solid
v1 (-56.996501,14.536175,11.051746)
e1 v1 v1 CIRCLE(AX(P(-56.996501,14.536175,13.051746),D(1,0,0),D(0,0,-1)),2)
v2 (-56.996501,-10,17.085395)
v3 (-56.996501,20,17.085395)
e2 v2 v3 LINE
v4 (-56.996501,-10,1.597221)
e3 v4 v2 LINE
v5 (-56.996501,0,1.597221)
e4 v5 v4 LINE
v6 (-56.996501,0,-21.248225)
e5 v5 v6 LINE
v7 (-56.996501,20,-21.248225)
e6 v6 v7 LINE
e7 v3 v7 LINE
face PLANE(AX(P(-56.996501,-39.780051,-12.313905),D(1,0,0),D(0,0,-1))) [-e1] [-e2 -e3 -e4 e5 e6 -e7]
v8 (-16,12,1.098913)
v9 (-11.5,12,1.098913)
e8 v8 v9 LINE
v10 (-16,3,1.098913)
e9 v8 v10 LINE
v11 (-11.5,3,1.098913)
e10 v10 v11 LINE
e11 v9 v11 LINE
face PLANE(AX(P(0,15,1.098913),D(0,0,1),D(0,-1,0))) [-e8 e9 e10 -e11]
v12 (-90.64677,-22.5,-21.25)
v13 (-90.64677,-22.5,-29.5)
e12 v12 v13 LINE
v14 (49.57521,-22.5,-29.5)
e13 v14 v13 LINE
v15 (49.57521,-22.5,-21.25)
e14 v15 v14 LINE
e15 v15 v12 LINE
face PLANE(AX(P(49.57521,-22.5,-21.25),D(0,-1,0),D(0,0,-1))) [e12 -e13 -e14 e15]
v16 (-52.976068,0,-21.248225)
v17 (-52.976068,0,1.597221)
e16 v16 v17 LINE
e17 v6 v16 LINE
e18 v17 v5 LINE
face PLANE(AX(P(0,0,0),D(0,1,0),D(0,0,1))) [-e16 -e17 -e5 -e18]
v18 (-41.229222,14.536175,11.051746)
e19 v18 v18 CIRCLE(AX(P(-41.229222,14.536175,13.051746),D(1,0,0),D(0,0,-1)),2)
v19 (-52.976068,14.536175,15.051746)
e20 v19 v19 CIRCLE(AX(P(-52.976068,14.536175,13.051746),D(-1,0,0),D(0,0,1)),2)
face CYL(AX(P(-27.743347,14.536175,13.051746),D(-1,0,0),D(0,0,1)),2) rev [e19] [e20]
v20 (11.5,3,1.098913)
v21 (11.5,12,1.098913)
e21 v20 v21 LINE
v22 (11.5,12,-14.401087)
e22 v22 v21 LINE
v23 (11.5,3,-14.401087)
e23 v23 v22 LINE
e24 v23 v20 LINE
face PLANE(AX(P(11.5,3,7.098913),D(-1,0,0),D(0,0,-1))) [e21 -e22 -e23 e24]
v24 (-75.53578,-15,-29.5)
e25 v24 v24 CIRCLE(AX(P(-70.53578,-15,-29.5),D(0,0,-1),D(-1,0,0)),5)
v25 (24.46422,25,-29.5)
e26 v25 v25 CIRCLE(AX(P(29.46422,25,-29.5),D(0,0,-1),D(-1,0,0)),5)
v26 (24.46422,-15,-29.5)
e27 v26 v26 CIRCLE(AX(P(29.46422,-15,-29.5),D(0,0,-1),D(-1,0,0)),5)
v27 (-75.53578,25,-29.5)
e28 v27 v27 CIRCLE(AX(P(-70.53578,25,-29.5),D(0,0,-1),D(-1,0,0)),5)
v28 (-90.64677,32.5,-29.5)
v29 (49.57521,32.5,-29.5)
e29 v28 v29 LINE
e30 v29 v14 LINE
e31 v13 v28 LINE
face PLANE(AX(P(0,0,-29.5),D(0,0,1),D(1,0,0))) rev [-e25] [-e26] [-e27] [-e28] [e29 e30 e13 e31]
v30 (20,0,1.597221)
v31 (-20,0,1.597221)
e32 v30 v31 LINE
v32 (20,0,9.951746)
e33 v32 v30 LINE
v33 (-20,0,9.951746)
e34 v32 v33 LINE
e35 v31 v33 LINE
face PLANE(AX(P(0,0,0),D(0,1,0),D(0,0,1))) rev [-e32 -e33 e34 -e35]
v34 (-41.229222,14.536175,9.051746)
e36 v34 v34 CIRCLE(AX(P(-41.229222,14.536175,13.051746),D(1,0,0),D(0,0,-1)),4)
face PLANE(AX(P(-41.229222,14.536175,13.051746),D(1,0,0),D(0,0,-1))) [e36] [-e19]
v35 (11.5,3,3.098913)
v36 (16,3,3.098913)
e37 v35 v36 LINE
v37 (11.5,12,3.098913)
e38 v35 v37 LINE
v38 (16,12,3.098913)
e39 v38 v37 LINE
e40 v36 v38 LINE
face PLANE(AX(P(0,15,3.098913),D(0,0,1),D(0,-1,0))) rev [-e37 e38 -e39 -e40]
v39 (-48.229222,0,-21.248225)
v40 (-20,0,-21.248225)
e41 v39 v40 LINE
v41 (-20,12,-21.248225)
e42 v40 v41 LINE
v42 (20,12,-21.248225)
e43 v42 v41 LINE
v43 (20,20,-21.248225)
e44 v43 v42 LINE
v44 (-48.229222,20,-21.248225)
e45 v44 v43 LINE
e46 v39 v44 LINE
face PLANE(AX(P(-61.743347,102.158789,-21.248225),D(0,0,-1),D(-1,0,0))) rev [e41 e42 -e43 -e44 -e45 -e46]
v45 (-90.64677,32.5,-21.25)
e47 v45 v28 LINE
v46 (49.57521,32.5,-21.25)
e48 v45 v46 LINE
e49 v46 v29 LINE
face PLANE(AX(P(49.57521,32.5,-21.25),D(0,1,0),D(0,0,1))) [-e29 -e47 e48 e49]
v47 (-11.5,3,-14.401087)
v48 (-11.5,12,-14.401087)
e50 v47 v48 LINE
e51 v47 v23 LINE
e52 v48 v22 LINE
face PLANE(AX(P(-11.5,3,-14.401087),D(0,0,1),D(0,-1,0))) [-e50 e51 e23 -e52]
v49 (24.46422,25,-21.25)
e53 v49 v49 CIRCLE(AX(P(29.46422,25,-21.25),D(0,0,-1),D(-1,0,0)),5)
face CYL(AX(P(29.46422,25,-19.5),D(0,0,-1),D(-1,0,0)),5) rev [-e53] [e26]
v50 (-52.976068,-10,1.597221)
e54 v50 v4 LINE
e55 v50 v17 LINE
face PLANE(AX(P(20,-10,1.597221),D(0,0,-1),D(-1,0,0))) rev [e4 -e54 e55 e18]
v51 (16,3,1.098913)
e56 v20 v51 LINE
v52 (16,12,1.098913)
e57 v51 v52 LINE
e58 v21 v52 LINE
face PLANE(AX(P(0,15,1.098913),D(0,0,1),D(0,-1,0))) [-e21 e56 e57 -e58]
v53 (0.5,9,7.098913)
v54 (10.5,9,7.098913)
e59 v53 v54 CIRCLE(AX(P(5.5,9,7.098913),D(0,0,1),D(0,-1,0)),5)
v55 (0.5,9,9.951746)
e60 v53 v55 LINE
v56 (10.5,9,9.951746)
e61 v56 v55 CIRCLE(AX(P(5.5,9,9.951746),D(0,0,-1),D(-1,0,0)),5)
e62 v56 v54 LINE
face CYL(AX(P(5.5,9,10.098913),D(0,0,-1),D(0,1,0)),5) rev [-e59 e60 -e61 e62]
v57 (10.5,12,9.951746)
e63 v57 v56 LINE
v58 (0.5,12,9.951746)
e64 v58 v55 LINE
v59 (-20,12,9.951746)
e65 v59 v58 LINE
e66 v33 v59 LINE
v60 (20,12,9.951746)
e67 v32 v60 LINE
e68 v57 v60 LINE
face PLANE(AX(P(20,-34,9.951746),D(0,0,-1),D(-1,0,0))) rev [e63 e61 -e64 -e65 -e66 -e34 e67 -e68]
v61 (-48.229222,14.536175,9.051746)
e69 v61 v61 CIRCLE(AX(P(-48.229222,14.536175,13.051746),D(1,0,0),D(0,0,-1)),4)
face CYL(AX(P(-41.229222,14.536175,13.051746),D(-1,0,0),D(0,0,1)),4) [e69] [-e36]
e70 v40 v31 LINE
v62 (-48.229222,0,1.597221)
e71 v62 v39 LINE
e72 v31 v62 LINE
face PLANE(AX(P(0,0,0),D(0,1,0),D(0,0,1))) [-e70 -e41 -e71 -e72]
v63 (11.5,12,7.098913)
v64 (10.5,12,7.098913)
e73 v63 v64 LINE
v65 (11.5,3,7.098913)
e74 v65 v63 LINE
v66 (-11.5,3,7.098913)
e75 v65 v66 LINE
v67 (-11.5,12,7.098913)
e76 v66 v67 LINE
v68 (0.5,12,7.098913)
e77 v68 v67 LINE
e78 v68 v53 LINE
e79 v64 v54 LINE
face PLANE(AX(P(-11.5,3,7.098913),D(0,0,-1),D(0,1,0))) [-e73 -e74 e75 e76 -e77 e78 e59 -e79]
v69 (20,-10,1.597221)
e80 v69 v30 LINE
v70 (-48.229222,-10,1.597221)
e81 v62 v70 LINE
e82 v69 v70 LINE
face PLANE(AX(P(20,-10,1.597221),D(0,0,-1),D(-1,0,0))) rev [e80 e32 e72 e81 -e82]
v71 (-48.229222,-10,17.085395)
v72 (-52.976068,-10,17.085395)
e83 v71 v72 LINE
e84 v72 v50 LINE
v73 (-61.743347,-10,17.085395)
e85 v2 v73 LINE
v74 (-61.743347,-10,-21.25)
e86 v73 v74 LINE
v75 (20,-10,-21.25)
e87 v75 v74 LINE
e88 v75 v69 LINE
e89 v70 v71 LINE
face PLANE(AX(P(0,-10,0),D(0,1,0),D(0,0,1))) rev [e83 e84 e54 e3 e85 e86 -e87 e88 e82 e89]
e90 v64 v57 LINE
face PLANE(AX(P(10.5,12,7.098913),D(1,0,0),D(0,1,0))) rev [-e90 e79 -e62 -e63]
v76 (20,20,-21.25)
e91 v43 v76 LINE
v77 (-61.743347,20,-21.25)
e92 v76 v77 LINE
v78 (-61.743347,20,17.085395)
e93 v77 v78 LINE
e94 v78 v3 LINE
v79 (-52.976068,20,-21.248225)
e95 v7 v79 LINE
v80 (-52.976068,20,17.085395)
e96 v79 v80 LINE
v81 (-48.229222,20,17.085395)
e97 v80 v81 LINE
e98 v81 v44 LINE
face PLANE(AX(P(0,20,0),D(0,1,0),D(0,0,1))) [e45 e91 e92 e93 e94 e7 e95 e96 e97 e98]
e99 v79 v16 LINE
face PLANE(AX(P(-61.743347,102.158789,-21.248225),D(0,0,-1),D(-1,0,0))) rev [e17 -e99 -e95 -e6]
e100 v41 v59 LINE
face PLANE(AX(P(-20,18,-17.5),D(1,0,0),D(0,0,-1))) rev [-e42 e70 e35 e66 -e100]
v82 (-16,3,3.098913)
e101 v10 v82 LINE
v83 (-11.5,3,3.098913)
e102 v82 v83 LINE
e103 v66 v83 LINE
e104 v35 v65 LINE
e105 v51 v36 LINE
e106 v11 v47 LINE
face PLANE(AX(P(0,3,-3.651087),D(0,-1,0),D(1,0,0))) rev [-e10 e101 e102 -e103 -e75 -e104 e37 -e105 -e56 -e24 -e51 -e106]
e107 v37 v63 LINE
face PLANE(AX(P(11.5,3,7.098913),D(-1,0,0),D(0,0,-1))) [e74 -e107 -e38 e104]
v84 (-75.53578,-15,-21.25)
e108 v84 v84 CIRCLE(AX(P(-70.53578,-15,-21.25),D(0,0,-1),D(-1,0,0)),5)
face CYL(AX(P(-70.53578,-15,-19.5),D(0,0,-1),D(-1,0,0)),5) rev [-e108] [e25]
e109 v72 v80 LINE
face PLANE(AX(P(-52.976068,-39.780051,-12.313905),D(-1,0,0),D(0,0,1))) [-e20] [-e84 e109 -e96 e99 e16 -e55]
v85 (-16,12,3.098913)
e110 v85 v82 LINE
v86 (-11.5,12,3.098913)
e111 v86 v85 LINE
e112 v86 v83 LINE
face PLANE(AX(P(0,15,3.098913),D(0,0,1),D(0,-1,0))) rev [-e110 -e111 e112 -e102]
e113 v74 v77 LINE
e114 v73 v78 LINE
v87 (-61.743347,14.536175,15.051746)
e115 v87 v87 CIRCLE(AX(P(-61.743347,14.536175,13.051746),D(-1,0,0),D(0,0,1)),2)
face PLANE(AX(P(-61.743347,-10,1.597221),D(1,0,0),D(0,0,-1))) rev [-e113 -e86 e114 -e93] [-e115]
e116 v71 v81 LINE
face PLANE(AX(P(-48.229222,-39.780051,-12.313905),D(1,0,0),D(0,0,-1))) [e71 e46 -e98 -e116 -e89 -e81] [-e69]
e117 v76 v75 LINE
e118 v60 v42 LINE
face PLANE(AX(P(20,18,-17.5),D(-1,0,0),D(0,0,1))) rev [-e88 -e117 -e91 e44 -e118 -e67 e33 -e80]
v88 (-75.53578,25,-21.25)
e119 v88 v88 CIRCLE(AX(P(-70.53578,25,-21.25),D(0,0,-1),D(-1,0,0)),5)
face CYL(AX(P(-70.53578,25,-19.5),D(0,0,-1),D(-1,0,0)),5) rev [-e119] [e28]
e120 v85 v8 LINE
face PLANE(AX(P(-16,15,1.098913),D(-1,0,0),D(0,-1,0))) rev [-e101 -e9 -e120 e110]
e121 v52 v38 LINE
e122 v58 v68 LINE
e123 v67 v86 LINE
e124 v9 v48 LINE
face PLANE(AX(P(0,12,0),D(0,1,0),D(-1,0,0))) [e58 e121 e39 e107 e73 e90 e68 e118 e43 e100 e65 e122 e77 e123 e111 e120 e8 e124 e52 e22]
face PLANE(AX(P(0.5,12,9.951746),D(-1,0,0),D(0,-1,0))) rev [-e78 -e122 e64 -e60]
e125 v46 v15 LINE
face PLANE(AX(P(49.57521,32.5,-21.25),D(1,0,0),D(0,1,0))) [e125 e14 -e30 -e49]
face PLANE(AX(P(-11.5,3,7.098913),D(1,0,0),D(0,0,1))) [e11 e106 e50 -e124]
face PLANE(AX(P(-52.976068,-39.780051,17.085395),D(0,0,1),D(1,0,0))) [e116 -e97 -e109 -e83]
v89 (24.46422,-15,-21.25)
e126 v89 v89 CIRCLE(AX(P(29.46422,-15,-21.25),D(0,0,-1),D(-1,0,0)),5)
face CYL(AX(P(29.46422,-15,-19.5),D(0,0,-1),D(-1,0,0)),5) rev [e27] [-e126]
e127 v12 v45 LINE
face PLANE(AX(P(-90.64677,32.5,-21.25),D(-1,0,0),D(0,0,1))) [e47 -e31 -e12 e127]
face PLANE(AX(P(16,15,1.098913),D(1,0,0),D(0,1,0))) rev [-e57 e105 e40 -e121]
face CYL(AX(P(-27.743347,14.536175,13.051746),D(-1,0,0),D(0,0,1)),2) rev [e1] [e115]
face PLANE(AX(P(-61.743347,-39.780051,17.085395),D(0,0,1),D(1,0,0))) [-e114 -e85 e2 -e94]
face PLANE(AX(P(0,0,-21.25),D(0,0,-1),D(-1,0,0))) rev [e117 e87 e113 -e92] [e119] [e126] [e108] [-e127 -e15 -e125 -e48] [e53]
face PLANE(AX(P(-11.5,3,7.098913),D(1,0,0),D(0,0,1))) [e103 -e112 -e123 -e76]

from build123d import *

# Parameters (mm, degrees)
SKETCH1_W                       = 40
SKETCH1_H                       = 35
BOSS_EXTRUDE1_DEPTH             = 18
CAVITY1_START                   = -14.401086919
CAVITY1_OUTLINE_W               = 23
CAVITY1_OUTLINE_H               = 12
CAVITY1_DEPTH                   = 21.5
CAVITY1_START_2                 = 7.098913081
CAVITY1_2_OUTLINE_R             = 5
CAVITY1_2_DEPTH                 = 3
CAVITY1_START_3                 = 1.098913081
CAVITY1_3_DEPTH                 = 2
CAVITY1_START_4                 = 10.098913081
CAVITY1_4_OUTLINE_R             = 2.5
CAVITY1_4_DEPTH                 = 4
CUT_EXTRUDE1_DEPTH              = 42.733432002
CUT_EXTRUDE1_DEPTH_BACK         = 42.733432002
SKETCH2_W                       = 52.530025258
SKETCH2_H                       = 12.54309889
CUT_EXTRUDE2_DEPTH              = 43
SKETCH4_W                       = 40
SKETCH4_H                       = 7.548254148
CUT_EXTRUDE3_DEPTH              = 43
BOSS_EXTRUDE2_DEPTH             = 3
SKETCH6_W                       = 81.743347259
SKETCH6_H                       = 13.911125845
BOSS_EXTRUDE3_DEPTH             = 10
SKETCH8_W                       = 4.746846532
SKETCH8_H                       = 29.399300547
BOSS_EXTRUDE4_DEPTH             = 20
BOSS_EXTRUDE4_DIRECTION_2_REACH = 67.288
SKETCH9_R                       = 2
CUT_EXTRUDE4_DEPTH              = 34
SKETCH10_R                      = 4
SKETCH10_R_2                    = 2
BOSS_EXTRUDE5_DEPTH             = 7
BOSS_EXTRUDE6_DEPTH             = 5.186094658
BOSS_EXTRUDE7_DEPTH             = 12
SKETCH14_W                      = 81.743347259
SKETCH14_H                      = 8.25177529
BOSS_EXTRUDE8_DEPTH             = 20
SKETCH16_W                      = 140.221979832
SKETCH16_H                      = 55
BOSS_EXTRUDE9_DEPTH             = 8.25
SKETCH17_R                      = 5
CUT_EXTRUDE5_DEPTH              = 10


# Read off the part's stored shape, not the designer's step: Cavity1
with BuildPart() as part:
    # Sketch1 → Boss-Extrude1 (new body)
    with BuildSketch(Plane(origin=(0, 0, 0), x_dir=(1, 0, 0), z_dir=(0, 1, 0))):
        Rectangle(SKETCH1_W, SKETCH1_H)
    extrude(amount=BOSS_EXTRUDE1_DEPTH)

    # Cavity1 outline → Cavity1 (cut)
    with BuildSketch(Plane.XY.offset(CAVITY1_START)):
        with Locations((0, 9)):
            Rectangle(CAVITY1_OUTLINE_W, CAVITY1_OUTLINE_H)
    extrude(amount=CAVITY1_DEPTH, mode=Mode.SUBTRACT)

    # Cavity1 2 outline → Cavity1 2 (cut)
    with BuildSketch(Plane.XY.offset(CAVITY1_START_2)):
        with Locations((5.5, 9)):
            Circle(CAVITY1_2_OUTLINE_R)
    extrude(amount=CAVITY1_2_DEPTH, mode=Mode.SUBTRACT)

    # Cavity1 3 outline → Cavity1 3 (cut)
    with BuildSketch(Plane.XY.offset(CAVITY1_START_3)):
        with BuildLine():
            Line((-11.5, 15), (-16, 15))
            Line((-16, 15), (-16, 10.821261352))
            Line((-16, 10.821261352), (-14.337589365, 10.821261352))
            ThreePointArc((-14.337589365, 10.821261352), (-12.516328014, 9), (-14.337589365, 7.178738648))
            Line((-14.337589365, 7.178738648), (-16, 7.178738648))
            Line((-16, 7.178738648), (-16, 3))
            Line((-16, 3), (-11.5, 3))
            Line((-11.5, 3), (-11.5, 15))
        make_face()
        with BuildLine():
            Line((16, 15), (11.5, 15))
            Line((11.5, 15), (11.5, 3))
            Line((11.5, 3), (16, 3))
            Line((16, 3), (16, 7.178738648))
            Line((16, 7.178738648), (14.337589365, 7.178738648))
            ThreePointArc((14.337589365, 7.178738648), (12.516328014, 9), (14.337589365, 10.821261352))
            Line((14.337589365, 10.821261352), (16, 10.821261352))
            Line((16, 10.821261352), (16, 15))
        make_face()
    extrude(amount=CAVITY1_3_DEPTH, mode=Mode.SUBTRACT)

    # Cavity1 4 outline → Cavity1 4 (cut)
    with BuildSketch(Plane.XY.offset(CAVITY1_START_4)):
        with Locations((5.5, 9)):
            Circle(CAVITY1_4_OUTLINE_R)
    extrude(amount=CAVITY1_4_DEPTH, mode=Mode.SUBTRACT)

    # Sketch2 → Cut-Extrude1 (cut, two sides: drawn at the far end of the back side and taken through both)
    with BuildSketch(Plane.XY.offset(-14.401086919).offset(-CUT_EXTRUDE1_DEPTH_BACK)):
        with Locations((5.5, 15.271549445)):
            Rectangle(SKETCH2_W, SKETCH2_H)
    extrude(amount=CUT_EXTRUDE1_DEPTH + CUT_EXTRUDE1_DEPTH_BACK, mode=Mode.SUBTRACT)

    # Sketch3 → Cut-Extrude2 (cut)
    with BuildSketch(Plane(origin=(0, 3, 0), x_dir=(1, 0, 0), z_dir=(0, 1, 0))):
        Polygon((-11.5, -3.098913081), (-11.5, -7.098913081), (11.5, -7.098913081), (11.5, -3.098913081), (16, -3.098913081), (16, -1.098913081), (11.5, -1.098913081), (11.5, 14.401086919), (-11.5, 14.401086919), (-11.5, -1.098913081), (-16, -1.098913081), (-16, -3.098913081), align=None)
    extrude(amount=CUT_EXTRUDE2_DEPTH, mode=Mode.SUBTRACT)

    # Sketch4 → Cut-Extrude3 (cut)
    with BuildSketch(Plane(origin=(0, 9, 0), x_dir=(1, 0, 0), z_dir=(0, 1, 0))):
        with Locations((0, -13.725872926)):
            Rectangle(SKETCH4_W, SKETCH4_H)
    extrude(amount=-CUT_EXTRUDE3_DEPTH, mode=Mode.SUBTRACT)

    # Sketch5 → Boss-Extrude2 (add)
    with BuildSketch(Plane(origin=(0, 9, 0), x_dir=(1, 0, 0), z_dir=(0, 1, 0))):
        Polygon((10.5, -9.951745852), (20, -9.951745852), (20, 17.5), (-20, 17.5), (-20, -9.951745852), (0.5, -9.951745852), (0.5, -7.098913081), (-11.5, -7.098913081), (-11.5, -3.098913081), (-16, -3.098913081), (-16, -1.098913081), (-11.5, -1.098913081), (-11.5, 14.401086919), (11.5, 14.401086919), (11.5, -1.098913081), (16, -1.098913081), (16, -3.098913081), (11.5, -3.098913081), (11.5, -7.098913081), (10.5, -7.098913081), align=None)
    extrude(amount=BOSS_EXTRUDE2_DEPTH)

    # Sketch6 → Boss-Extrude3 (add)
    with BuildSketch(Plane.XZ):
        with Locations((-20.87167363, -5.358342419)):
            Rectangle(SKETCH6_W, SKETCH6_H)
    extrude(amount=BOSS_EXTRUDE3_DEPTH)

    # Sketch8 → Boss-Extrude4 (add)
    with BuildSketch(Plane(origin=(0, 0, 0), x_dir=(1, 0, 0), z_dir=(0, 1, 0))):
        with Locations((-59.369923993, -2.385744932)):
            Rectangle(SKETCH8_W, SKETCH8_H)
        with Locations((-50.602645133, -2.385744932)):
            Rectangle(SKETCH8_W, SKETCH8_H)
    extrude(amount=BOSS_EXTRUDE4_DEPTH)

    # Boss-Extrude4 direction 2: up to this face of the body (flat: up to its plane)
    boss_extrude4_direction_2_end = Plane(part.part.faces().sort_by_distance((-20.87167363, -10, -5.358342419))[0])
    # Sketch8 → Boss-Extrude4 direction 2 (add, up to the picked face)
    with BuildSketch(Plane(origin=(0, 0, 0), x_dir=(1, 0, 0), z_dir=(0, 1, 0)), mode=Mode.PRIVATE) as boss_extrude4_direction_2_sk1:
        with Locations((-59.369923993, -2.385744932)):
            Rectangle(SKETCH8_W, SKETCH8_H)
    boss_extrude4_direction_2_tool1 = split(extrude(boss_extrude4_direction_2_sk1.sketch, amount=-BOSS_EXTRUDE4_DIRECTION_2_REACH, mode=Mode.PRIVATE), bisect_by=boss_extrude4_direction_2_end, keep=Keep.BOTH, mode=Mode.PRIVATE)
    # Sketch8 → Boss-Extrude4 direction 2 (add, up to the picked face)
    with BuildSketch(Plane(origin=(0, 0, 0), x_dir=(1, 0, 0), z_dir=(0, 1, 0)), mode=Mode.PRIVATE) as boss_extrude4_direction_2_sk2:
        with Locations((-50.602645133, -2.385744932)):
            Rectangle(SKETCH8_W, SKETCH8_H)
    boss_extrude4_direction_2_tool2 = split(extrude(boss_extrude4_direction_2_sk2.sketch, amount=-BOSS_EXTRUDE4_DIRECTION_2_REACH, mode=Mode.PRIVATE), bisect_by=boss_extrude4_direction_2_end, keep=Keep.BOTH, mode=Mode.PRIVATE)
    add(boss_extrude4_direction_2_tool1.solids().sort_by(Axis((-59.369924, 0, 2.385745), (0, -1, 0)))[0])
    add(boss_extrude4_direction_2_tool2.solids().sort_by(Axis((-50.602645, 0, 2.385745), (0, -1, 0)))[0])

    # Sketch9 → Cut-Extrude4 (cut)
    with BuildSketch(Plane.ZY.offset(61.743347259)):
        with Locations((13.051745852, 14.536175319)):
            Circle(SKETCH9_R)
    extrude(amount=-CUT_EXTRUDE4_DEPTH, mode=Mode.SUBTRACT)

    # Sketch10 → Boss-Extrude5 (add)
    with BuildSketch(Plane(origin=(-48.229221867, 0, 0), x_dir=(0, 0, -1), z_dir=(1, 0, 0))):
        with Locations((-13.051745852, 14.536175319)):
            Circle(SKETCH10_R)
        with Locations(Location((-13.051745852, 14.536175319, 0), (0, 0, 180))):
            Circle(SKETCH10_R_2, mode=Mode.SUBTRACT)
    extrude(amount=BOSS_EXTRUDE5_DEPTH)

    # Sketch11 → Boss-Extrude6 (add)
    with BuildSketch(Plane(origin=(0, 0, -12.313905342), x_dir=(-1, 0, 0), z_dir=(0, 0, -1))):
        Polygon((61.743347259, -10), (61.743347259, 20), (56.996500727, 20), (56.996500727, 0), (52.976068399, 0), (52.976068399, 20), (48.229221867, 20), (48.229221867, 0), (20, 0), (-20, 0), (-20, -10), align=None)
    extrude(amount=BOSS_EXTRUDE6_DEPTH)

    # Sketch12 → Boss-Extrude7 (add)
    with BuildSketch(Plane(origin=(0, 0, -17.5), x_dir=(-1, 0, 0), z_dir=(0, 0, -1))):
        Polygon((20, 0), (20, 12), (-20, 12), (-20, -10), (61.743347259, -10), (61.743347259, 20), (56.996500727, 20), (56.996500727, 0), (52.976068399, 0), (52.976068399, 20), (48.229221867, 20), (48.229221867, 0), align=None)
    extrude(amount=BOSS_EXTRUDE7_DEPTH)

    # Sketch14 → Boss-Extrude8 (add)
    with BuildSketch(Plane(origin=(0, 0, 0), x_dir=(1, 0, 0), z_dir=(0, 1, 0))):
        with Locations((-20.87167363, 25.374112355)):
            Rectangle(SKETCH14_W, SKETCH14_H)
    extrude(amount=BOSS_EXTRUDE8_DEPTH)

    # Sketch16 → Boss-Extrude9 (add)
    with BuildSketch(Plane(origin=(0, 0, -29.5), x_dir=(-1, 0, 0), z_dir=(0, 0, -1))):
        with Locations((20.535780022, 5)):
            Rectangle(SKETCH16_W, SKETCH16_H)
    extrude(amount=-BOSS_EXTRUDE9_DEPTH)

    # Sketch17 → Cut-Extrude5 (cut)
    with BuildSketch(Plane(origin=(0, 0, -29.5), x_dir=(-1, 0, 0), z_dir=(0, 0, -1))):
        with Locations((-29.464219978, 25)):
            Circle(SKETCH17_R)
        with Locations((-29.464219978, -15)):
            Circle(SKETCH17_R)
        with Locations((70.535780022, 25)):
            Circle(SKETCH17_R)
        with Locations((70.535780022, -15)):
            Circle(SKETCH17_R)
    extrude(amount=-CUT_EXTRUDE5_DEPTH, mode=Mode.SUBTRACT)


solid = part.part
